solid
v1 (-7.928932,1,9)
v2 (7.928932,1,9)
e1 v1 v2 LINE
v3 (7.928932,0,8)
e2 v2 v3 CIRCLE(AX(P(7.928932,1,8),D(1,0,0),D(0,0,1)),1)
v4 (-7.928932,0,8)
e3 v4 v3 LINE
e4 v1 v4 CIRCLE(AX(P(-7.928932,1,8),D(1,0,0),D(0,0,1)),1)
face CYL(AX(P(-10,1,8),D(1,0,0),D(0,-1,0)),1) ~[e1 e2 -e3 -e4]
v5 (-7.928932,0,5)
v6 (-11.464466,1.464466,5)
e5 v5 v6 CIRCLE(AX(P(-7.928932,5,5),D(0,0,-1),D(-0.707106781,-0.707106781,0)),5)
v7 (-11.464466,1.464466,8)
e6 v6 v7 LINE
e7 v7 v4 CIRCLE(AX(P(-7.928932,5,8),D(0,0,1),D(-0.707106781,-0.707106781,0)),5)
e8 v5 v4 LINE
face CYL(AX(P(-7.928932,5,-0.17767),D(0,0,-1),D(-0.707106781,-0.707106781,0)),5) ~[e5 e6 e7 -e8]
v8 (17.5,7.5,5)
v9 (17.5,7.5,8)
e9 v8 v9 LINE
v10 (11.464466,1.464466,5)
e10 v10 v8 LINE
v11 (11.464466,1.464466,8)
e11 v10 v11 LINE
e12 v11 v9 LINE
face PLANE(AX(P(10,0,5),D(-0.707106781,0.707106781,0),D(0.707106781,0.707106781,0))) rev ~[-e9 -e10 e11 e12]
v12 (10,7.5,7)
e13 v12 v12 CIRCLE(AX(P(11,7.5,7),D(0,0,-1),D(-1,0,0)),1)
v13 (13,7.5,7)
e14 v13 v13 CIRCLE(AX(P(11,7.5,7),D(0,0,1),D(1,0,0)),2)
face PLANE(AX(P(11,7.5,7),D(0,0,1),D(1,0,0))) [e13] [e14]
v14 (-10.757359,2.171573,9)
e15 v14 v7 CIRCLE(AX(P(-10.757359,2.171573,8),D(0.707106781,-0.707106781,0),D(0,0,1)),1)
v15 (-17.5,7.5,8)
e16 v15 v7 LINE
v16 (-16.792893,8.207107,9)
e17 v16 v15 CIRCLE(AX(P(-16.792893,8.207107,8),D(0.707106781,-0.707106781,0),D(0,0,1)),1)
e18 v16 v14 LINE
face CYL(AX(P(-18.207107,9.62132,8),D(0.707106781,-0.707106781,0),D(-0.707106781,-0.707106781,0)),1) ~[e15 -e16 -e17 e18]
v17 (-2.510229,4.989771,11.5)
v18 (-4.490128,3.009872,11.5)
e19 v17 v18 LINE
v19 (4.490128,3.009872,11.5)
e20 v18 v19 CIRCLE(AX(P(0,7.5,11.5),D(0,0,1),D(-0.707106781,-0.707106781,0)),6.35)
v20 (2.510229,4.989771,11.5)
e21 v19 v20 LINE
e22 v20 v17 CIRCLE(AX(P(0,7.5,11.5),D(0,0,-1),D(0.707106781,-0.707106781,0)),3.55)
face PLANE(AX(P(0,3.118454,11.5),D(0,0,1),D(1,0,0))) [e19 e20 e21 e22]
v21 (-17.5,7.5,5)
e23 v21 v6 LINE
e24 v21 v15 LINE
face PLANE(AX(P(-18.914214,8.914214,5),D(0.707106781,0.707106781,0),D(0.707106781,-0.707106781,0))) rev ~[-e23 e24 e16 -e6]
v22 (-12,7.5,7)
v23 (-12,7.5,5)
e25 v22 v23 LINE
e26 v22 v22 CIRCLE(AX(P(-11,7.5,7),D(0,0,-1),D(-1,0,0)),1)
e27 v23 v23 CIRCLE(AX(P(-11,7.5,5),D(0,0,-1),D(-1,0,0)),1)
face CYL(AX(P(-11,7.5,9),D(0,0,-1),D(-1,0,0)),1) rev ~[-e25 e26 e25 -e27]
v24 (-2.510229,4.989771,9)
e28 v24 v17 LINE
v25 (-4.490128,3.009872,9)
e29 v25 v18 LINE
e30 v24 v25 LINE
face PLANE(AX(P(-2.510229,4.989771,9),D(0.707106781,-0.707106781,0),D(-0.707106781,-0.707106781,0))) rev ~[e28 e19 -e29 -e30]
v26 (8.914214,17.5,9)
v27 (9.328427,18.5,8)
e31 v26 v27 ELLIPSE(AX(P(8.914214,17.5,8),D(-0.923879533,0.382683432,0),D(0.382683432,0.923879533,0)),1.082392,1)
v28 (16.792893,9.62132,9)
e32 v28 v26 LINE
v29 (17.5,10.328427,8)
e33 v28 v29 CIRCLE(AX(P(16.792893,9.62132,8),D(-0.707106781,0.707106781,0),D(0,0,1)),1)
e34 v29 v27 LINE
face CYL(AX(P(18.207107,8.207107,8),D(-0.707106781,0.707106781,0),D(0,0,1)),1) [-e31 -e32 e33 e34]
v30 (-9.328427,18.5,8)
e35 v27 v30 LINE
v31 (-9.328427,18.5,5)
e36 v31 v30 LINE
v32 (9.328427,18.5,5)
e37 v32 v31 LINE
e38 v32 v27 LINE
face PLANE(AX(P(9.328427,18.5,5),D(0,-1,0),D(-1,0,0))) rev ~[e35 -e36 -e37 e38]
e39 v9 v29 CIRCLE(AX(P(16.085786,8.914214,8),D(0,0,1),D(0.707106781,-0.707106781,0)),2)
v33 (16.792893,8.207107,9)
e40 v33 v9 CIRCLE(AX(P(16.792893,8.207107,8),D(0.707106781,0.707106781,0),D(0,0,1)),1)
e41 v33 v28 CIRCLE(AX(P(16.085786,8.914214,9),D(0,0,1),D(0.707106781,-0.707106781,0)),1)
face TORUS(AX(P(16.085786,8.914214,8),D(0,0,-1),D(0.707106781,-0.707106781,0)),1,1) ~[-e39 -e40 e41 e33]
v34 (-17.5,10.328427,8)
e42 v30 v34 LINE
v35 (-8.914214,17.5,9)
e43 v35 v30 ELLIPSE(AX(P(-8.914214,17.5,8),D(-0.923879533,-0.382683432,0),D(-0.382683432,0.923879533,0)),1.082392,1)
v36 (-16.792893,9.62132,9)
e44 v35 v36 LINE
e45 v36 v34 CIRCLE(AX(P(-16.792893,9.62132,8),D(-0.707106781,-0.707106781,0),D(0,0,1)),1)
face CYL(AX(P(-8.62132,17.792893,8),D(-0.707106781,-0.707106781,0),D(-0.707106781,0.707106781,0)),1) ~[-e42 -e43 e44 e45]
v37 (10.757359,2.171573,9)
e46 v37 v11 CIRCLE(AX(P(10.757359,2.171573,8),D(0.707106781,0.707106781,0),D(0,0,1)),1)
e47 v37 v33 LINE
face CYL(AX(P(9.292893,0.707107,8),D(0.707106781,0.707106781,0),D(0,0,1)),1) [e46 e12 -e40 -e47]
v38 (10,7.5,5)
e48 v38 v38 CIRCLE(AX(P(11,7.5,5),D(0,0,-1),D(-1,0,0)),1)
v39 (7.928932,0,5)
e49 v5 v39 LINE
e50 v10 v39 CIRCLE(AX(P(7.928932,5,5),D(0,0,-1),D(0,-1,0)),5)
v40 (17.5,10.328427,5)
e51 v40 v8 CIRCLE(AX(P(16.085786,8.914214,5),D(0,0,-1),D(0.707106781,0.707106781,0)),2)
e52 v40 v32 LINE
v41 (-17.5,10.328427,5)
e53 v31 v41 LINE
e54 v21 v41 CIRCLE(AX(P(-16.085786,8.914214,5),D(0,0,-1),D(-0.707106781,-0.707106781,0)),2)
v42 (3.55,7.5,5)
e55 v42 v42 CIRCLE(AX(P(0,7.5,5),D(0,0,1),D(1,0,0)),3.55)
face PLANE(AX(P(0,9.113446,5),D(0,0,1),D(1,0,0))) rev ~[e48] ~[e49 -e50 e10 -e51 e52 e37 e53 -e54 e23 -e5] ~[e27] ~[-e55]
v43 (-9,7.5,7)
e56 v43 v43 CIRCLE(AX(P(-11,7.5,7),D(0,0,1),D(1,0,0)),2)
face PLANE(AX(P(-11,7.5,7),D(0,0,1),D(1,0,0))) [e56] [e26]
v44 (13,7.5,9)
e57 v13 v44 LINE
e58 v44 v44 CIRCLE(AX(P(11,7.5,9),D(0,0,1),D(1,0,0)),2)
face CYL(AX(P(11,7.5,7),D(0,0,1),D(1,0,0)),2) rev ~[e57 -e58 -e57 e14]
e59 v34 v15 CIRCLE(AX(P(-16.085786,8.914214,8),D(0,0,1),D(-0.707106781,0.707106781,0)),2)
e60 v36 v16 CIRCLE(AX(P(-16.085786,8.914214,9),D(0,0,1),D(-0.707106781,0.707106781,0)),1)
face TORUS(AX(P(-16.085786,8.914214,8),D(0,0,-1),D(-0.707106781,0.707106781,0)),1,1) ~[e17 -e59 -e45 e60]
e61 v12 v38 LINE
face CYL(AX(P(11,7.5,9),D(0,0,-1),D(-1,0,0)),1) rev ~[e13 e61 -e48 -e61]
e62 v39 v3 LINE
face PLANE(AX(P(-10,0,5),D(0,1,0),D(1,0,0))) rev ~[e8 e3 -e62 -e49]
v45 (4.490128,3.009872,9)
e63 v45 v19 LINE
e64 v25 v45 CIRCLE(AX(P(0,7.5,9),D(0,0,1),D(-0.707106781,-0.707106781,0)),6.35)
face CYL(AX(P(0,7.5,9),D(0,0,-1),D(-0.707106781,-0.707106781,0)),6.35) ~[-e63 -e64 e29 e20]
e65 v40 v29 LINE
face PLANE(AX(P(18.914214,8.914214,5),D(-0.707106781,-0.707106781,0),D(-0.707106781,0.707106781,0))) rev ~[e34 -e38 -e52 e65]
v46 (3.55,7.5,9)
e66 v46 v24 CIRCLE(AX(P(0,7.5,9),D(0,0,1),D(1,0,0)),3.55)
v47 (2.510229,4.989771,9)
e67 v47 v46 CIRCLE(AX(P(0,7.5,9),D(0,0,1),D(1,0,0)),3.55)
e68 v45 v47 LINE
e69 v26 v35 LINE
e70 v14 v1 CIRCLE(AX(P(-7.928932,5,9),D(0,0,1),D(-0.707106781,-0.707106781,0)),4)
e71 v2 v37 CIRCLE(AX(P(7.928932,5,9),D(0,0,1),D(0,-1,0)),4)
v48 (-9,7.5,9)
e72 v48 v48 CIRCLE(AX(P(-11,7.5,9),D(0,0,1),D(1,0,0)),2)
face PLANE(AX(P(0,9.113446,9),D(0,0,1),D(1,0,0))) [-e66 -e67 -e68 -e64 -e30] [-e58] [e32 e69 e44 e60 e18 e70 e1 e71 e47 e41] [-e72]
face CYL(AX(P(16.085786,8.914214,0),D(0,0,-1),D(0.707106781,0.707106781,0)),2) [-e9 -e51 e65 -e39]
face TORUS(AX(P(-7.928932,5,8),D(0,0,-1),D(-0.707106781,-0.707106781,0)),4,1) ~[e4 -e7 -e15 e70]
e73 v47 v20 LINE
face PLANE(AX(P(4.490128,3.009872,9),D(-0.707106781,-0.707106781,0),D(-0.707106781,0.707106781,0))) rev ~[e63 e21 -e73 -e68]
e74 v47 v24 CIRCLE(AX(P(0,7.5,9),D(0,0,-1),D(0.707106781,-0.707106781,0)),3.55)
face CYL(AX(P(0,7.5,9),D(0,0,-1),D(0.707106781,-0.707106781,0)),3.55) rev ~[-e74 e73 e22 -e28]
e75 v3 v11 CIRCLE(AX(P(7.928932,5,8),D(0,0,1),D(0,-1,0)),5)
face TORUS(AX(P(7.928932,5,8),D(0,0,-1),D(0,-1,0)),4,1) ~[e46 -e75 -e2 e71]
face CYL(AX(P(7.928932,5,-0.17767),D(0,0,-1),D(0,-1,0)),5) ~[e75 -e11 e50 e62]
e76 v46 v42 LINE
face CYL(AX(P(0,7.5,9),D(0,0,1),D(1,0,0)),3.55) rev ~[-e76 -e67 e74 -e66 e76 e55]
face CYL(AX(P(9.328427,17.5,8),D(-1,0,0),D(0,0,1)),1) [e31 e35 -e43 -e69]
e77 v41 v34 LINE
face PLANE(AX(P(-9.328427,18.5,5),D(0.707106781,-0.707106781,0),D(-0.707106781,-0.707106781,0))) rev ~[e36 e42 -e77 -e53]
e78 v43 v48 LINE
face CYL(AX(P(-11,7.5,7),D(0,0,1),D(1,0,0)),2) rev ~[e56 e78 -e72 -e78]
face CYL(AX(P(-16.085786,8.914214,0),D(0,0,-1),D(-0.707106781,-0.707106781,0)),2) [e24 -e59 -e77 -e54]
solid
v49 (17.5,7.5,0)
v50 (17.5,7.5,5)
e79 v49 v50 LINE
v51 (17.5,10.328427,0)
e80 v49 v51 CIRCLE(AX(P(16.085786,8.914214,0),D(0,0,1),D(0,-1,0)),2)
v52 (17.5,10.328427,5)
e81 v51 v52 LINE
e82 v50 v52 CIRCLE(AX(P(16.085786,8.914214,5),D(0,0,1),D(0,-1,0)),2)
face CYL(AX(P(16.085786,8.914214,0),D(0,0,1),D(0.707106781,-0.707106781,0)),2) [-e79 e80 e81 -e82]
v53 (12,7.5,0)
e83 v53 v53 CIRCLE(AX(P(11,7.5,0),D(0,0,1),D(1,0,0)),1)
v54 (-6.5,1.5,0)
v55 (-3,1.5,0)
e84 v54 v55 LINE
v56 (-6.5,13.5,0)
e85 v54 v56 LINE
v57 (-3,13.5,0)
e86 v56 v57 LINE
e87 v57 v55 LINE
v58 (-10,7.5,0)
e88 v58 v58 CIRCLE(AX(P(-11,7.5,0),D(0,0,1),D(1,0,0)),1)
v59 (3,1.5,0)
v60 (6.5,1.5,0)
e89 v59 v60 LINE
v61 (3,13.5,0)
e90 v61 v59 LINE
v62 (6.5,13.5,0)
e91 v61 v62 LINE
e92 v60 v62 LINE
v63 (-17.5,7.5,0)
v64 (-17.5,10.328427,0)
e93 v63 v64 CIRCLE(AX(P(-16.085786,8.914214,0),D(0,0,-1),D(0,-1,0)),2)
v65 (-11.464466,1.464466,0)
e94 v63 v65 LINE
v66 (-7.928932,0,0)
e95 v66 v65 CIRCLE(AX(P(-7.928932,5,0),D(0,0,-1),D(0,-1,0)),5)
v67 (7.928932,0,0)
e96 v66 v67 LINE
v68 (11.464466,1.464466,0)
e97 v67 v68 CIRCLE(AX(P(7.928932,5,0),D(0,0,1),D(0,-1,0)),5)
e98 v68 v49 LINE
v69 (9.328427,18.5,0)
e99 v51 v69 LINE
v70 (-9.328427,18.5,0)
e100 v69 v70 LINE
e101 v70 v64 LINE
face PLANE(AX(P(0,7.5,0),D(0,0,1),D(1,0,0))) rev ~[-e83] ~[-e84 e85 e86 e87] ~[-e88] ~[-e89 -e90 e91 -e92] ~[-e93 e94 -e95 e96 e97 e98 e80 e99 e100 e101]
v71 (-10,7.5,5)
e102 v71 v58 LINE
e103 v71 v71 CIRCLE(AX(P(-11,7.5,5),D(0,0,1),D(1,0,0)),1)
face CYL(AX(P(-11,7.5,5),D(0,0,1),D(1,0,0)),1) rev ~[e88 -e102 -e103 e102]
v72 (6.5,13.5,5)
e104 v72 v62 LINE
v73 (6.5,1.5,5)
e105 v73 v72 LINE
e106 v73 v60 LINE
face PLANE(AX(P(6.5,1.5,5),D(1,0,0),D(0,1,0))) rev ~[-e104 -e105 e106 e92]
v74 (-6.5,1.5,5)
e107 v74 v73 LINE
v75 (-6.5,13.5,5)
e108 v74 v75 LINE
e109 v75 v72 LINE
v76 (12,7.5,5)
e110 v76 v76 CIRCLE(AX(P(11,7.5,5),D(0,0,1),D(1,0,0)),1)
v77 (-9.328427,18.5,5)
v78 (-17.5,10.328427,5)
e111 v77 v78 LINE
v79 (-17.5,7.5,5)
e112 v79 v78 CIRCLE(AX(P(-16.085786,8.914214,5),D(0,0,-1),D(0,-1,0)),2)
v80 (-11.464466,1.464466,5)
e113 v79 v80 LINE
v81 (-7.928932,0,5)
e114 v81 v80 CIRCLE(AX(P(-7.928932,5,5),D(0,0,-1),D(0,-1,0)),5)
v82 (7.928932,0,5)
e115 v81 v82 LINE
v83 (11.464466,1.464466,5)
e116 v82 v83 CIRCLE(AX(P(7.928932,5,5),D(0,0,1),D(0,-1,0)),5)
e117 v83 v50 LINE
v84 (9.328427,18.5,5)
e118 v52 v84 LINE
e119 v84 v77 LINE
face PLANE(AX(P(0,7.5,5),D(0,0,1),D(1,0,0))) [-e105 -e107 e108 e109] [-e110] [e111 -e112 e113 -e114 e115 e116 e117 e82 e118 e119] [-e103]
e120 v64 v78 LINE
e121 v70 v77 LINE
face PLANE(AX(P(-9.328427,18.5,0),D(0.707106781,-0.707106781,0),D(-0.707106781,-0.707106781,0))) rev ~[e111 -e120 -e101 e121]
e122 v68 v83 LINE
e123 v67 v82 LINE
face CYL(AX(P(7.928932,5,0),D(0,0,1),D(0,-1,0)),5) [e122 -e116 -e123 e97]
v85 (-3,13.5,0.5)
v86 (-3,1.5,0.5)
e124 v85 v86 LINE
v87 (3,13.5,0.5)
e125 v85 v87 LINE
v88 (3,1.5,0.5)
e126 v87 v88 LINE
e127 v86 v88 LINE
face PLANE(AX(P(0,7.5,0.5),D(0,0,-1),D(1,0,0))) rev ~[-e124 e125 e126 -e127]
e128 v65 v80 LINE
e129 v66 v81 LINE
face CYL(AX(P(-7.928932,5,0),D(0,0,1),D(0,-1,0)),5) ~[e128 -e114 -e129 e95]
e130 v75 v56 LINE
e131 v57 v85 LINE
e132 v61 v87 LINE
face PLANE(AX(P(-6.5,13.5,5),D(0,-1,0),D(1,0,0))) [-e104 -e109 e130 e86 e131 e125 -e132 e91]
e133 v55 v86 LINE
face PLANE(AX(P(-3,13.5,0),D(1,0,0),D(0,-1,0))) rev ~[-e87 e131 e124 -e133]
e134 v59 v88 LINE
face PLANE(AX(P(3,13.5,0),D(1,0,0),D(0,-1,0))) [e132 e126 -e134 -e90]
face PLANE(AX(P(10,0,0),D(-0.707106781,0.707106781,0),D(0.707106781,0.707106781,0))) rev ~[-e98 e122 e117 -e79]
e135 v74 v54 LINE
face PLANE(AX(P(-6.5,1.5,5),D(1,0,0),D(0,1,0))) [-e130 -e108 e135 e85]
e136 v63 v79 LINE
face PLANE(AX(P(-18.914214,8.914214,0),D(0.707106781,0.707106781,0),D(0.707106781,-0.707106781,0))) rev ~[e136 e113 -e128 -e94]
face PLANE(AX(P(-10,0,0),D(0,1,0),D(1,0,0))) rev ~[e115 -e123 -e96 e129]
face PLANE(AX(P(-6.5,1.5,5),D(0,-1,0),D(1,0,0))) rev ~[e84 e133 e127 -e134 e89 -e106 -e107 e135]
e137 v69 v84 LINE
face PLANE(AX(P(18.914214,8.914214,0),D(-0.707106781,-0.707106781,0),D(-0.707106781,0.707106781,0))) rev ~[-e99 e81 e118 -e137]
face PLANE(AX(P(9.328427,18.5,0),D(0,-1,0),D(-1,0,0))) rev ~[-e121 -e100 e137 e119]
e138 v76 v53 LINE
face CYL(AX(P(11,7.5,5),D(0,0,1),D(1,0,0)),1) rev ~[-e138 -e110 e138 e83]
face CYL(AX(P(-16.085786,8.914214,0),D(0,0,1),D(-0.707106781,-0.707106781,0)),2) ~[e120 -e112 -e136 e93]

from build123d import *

# Parameters (mm, degrees)
F0_W            = 20
F0_H            = 15
F1_DEPTH        = 5
F2_R            = 1
F2_W            = 13
F2_H            = 12
F3_DEPTH        = 5
F4_W            = 6
F4_H            = 12
F5_DEPTH        = 0.5
F7_DEPTH        = 4
F8_R            = 3.55
F9_DEPTH        = 4
F10_R           = 1
F11_D           = 2
F11_DEPTH       = 20
F11_CBORE_D     = 4
F11_CBORE_DEPTH = 2
F11_TIP         = 0.600860619
F12_F1_R        = 5
F12_F2_R        = 5
F12_2_T1_DEPTH  = 9.1776695297
F12_2_T4_ANGLE  = 45
F12_2_T6_ANGLE  = 45
F13_R           = 2
F15_T1_DEPTH    = 9
F15_T4_ANGLE    = 90
F15_T6_ANGLE    = 90
F17_DEPTH       = 2.5


# Not quite as in the source:
# - a fillet or chamfer that OpenCascade refuses, or shapes differently, is made with other operations: its cross-section is extruded or revolved along the edge and cut away or added
# - two fillets or chamfers of one size are made in one step


with BuildPart() as f1:
    # F0 (on Top) → F1 (new body)
    with BuildSketch(Plane.XY):
        with Locations((0, 7.5)):
            Rectangle(F0_W, F0_H)
        Polygon((17.5, 7.5), (10, 15), (10, 0), align=None)
        Polygon((6.5, 18.5), (10, 15), (17.5, 7.5), (18.9142135624, 8.9142135624), (9.3284271247, 18.5), align=None)
        Polygon((-10, 15), (10, 15), (6.5, 18.5), (-6.5, 18.5), align=None)
        Polygon((-10, 0), (-10, 15), (-17.5, 7.5), align=None)
        Polygon((-17.5, 7.5), (-10, 15), (-6.5, 18.5), (-9.3284271247, 18.5), (-18.9142135624, 8.9142135624), align=None)
    extrude(amount=F1_DEPTH)

    # F2 (on face) → F3 (cut)
    with BuildSketch(Plane.XY.offset(5)):
        with Locations((-11, 7.5)):
            Circle(F2_R)
        with Locations((11, 7.5)):
            Circle(F2_R)
        with Locations((0, 7.5)):
            Rectangle(F2_W, F2_H)
    extrude(amount=-F3_DEPTH, mode=Mode.SUBTRACT)

    # F4 (on face) → F5 (join)
    with BuildSketch(Plane(origin=(0, 0, 0), x_dir=(1, 0, 0), z_dir=(0, 0, -1))):
        with Locations((0, -7.5)):
            Rectangle(F4_W, F4_H)
    extrude(amount=-F5_DEPTH)

    # F12: fillet of radius 5 on 2 edges, made by hand

    # F12_f1
    f12_f1_edges = [f1.edges().sort_by_distance(p)[0] for p in [
        (-10, 0, 2.5),
    ]]
    fillet(f12_f1_edges, radius=F12_F1_R)

    # F12_f2
    f12_f2_edges = [f1.edges().sort_by_distance(p)[0] for p in [
        (10, 0, 2.5),
    ]]
    fillet(f12_f2_edges, radius=F12_F2_R)

    # F13
    f13_edges = [f1.edges().sort_by_distance(p)[0] for p in [
        (-18.914214, 8.914214, 2.5),
        (18.914214, 8.914214, 2.5),
    ]]
    fillet(f13_edges, radius=F13_R)


with BuildPart() as f7:
    # F6 (on face) → F7 (new body)
    with BuildSketch(Plane.XY.offset(5)):
        Polygon((-18.9142135624, 8.9142135624), (-10, 0), (10, 0), (18.9142135624, 8.9142135624), (9.3284271247, 18.5), (-9.3284271247, 18.5), align=None)
    extrude(amount=F7_DEPTH)

    # F8 (on face) → F9 (cut)
    with BuildSketch(Plane.XY.offset(9)):
        with Locations((0, 7.5)):
            Circle(F8_R)
    extrude(amount=-F9_DEPTH, mode=Mode.SUBTRACT)

    # F10
    f10_edges = [f7.edges().sort_by_distance(p)[0] for p in [
        (-14.457107, 4.457107, 9),
        (0, 0, 9),
        (14.457107, 4.457107, 9),
        (14.12132, 13.707107, 9),
        (0, 18.5, 9),
        (-14.12132, 13.707107, 9),
    ]]
    fillet(f10_edges, radius=F10_R)

    # F11
    with Locations(Plane.XY.offset(9)):
        with Locations((11, 7.5), (-11, 7.5)):
            CounterBoreHole(F11_D / 2, F11_CBORE_D / 2, F11_CBORE_DEPTH, depth=F11_DEPTH)
            with Locations((0, 0, -(F11_DEPTH + F11_TIP / 2))):  # 118° drill point
                Cone(0, F11_D / 2, F11_TIP, mode=Mode.SUBTRACT)

    # F12#2: fillet of radius 5 on 2 edges, made by hand

    # F12_2_s2 → F12_2_t1 (cut)
    with BuildSketch(Plane.XY.offset(-0.1776695297)):
        with BuildLine():
            ThreePointArc((-11.4644660941, 1.4644660941), (-9.84234935, 0.3806023374), (-7.9289321881, 0))
            Line((-7.9289321881, 0), (-10, 0))
            Line((-10, 0), (-11.4644660941, 1.4644660941))
        make_face()
        with BuildLine():
            ThreePointArc((7.9289321881, 0), (9.84234935, 0.3806023374), (11.4644660941, 1.4644660941))
            Line((11.4644660941, 1.4644660941), (10, 0))
            Line((10, 0), (7.9289321881, 0))
        make_face()
    extrude(amount=F12_2_T1_DEPTH, mode=Mode.SUBTRACT)

    # F12_2_s3 → F12_2_t4 (revolve, cut)
    with BuildSketch(Plane.YZ.offset(7.9289321881)):
        with BuildLine():
            ThreePointArc((1, 9), (0.2928932188, 8.7071067812), (0, 8))
            Line((0, 8), (0, 9))
            Line((0, 9), (1, 9))
        make_face()
    revolve(axis=Axis((7.9289321881, 5, 9), (0, 0, 1)), revolution_arc=F12_2_T4_ANGLE, mode=Mode.SUBTRACT)

    # F12_2_s5 → F12_2_t6 (revolve, cut)
    with BuildSketch(Plane(origin=(-6.4644660941, 6.4644660941, 0), x_dir=(0, 0, 1), z_dir=(-0.7071067812, 0.7071067812, 0))):
        with BuildLine():
            ThreePointArc((9, -6.0710678119), (8.7071067812, -6.7781745931), (8, -7.0710678119))
            Line((8, -7.0710678119), (9, -7.0710678119))
            Line((9, -7.0710678119), (9, -6.0710678119))
        make_face()
    revolve(axis=Axis((-7.9289321881, 5, 9), (0, 0, 1)), revolution_arc=F12_2_T6_ANGLE, mode=Mode.SUBTRACT)

    # F15: fillet of radius 2 on 2 edges, made by hand

    # F15_s2 → F15_t1 (cut)
    with BuildSketch(Plane.XY):
        with BuildLine():
            ThreePointArc((-17.5, 7.5), (-18.0857864376, 8.9142135624), (-17.5, 10.3284271247))
            Line((-17.5, 10.3284271247), (-18.9142135624, 8.9142135624))
            Line((-18.9142135624, 8.9142135624), (-17.5, 7.5))
        make_face()
        with BuildLine():
            ThreePointArc((17.5, 10.3284271247), (18.0857864376, 8.9142135624), (17.5, 7.5))
            Line((17.5, 7.5), (18.9142135624, 8.9142135624))
            Line((18.9142135624, 8.9142135624), (17.5, 10.3284271247))
        make_face()
    extrude(amount=F15_T1_DEPTH, mode=Mode.SUBTRACT)

    # F15_s3 → F15_t4 (revolve, cut)
    with BuildSketch(Plane(origin=(12.5, 12.5, 0), x_dir=(0, 0, 1), z_dir=(-0.7071067812, -0.7071067812, 0))):
        with BuildLine():
            ThreePointArc((9, -6.0710678119), (8.7071067812, -6.7781745931), (8, -7.0710678119))
            Line((8, -7.0710678119), (9, -7.0710678119))
            Line((9, -7.0710678119), (9, -6.0710678119))
        make_face()
    revolve(axis=Axis((16.0857864376, 8.9142135624, 9), (0, 0, 1)), revolution_arc=F15_T4_ANGLE, mode=Mode.SUBTRACT)

    # F15_s5 → F15_t6 (revolve, cut)
    with BuildSketch(Plane(origin=(-3.5857864376, -3.5857864376, 0), x_dir=(0, 0, 1), z_dir=(0.7071067812, 0.7071067812, 0))):
        with BuildLine():
            ThreePointArc((9, -18.6776695297), (8.7071067812, -19.3847763109), (8, -19.6776695297))
            Line((8, -19.6776695297), (9, -19.6776695297))
            Line((9, -19.6776695297), (9, -18.6776695297))
        make_face()
    revolve(axis=Axis((-16.0857864376, 8.9142135624, 9), (0, 0, 1)), revolution_arc=F15_T6_ANGLE, mode=Mode.SUBTRACT)

    # F16 (on face) → F17 (join)
    with BuildSketch(Plane.XY.offset(9)):
        with BuildLine():
            Line((-2.5102290732, 4.9897709268), (-4.4901280605, 3.0098719395))
            ThreePointArc((-4.4901280605, 3.0098719395), (0, 1.15), (4.4901280605, 3.0098719395))
            Line((4.4901280605, 3.0098719395), (2.5102290732, 4.9897709268))
            ThreePointArc((2.5102290732, 4.9897709268), (0, 3.95), (-2.5102290732, 4.9897709268))
        make_face()
    extrude(amount=F17_DEPTH)


solid = Compound([f1.part, f7.part])
